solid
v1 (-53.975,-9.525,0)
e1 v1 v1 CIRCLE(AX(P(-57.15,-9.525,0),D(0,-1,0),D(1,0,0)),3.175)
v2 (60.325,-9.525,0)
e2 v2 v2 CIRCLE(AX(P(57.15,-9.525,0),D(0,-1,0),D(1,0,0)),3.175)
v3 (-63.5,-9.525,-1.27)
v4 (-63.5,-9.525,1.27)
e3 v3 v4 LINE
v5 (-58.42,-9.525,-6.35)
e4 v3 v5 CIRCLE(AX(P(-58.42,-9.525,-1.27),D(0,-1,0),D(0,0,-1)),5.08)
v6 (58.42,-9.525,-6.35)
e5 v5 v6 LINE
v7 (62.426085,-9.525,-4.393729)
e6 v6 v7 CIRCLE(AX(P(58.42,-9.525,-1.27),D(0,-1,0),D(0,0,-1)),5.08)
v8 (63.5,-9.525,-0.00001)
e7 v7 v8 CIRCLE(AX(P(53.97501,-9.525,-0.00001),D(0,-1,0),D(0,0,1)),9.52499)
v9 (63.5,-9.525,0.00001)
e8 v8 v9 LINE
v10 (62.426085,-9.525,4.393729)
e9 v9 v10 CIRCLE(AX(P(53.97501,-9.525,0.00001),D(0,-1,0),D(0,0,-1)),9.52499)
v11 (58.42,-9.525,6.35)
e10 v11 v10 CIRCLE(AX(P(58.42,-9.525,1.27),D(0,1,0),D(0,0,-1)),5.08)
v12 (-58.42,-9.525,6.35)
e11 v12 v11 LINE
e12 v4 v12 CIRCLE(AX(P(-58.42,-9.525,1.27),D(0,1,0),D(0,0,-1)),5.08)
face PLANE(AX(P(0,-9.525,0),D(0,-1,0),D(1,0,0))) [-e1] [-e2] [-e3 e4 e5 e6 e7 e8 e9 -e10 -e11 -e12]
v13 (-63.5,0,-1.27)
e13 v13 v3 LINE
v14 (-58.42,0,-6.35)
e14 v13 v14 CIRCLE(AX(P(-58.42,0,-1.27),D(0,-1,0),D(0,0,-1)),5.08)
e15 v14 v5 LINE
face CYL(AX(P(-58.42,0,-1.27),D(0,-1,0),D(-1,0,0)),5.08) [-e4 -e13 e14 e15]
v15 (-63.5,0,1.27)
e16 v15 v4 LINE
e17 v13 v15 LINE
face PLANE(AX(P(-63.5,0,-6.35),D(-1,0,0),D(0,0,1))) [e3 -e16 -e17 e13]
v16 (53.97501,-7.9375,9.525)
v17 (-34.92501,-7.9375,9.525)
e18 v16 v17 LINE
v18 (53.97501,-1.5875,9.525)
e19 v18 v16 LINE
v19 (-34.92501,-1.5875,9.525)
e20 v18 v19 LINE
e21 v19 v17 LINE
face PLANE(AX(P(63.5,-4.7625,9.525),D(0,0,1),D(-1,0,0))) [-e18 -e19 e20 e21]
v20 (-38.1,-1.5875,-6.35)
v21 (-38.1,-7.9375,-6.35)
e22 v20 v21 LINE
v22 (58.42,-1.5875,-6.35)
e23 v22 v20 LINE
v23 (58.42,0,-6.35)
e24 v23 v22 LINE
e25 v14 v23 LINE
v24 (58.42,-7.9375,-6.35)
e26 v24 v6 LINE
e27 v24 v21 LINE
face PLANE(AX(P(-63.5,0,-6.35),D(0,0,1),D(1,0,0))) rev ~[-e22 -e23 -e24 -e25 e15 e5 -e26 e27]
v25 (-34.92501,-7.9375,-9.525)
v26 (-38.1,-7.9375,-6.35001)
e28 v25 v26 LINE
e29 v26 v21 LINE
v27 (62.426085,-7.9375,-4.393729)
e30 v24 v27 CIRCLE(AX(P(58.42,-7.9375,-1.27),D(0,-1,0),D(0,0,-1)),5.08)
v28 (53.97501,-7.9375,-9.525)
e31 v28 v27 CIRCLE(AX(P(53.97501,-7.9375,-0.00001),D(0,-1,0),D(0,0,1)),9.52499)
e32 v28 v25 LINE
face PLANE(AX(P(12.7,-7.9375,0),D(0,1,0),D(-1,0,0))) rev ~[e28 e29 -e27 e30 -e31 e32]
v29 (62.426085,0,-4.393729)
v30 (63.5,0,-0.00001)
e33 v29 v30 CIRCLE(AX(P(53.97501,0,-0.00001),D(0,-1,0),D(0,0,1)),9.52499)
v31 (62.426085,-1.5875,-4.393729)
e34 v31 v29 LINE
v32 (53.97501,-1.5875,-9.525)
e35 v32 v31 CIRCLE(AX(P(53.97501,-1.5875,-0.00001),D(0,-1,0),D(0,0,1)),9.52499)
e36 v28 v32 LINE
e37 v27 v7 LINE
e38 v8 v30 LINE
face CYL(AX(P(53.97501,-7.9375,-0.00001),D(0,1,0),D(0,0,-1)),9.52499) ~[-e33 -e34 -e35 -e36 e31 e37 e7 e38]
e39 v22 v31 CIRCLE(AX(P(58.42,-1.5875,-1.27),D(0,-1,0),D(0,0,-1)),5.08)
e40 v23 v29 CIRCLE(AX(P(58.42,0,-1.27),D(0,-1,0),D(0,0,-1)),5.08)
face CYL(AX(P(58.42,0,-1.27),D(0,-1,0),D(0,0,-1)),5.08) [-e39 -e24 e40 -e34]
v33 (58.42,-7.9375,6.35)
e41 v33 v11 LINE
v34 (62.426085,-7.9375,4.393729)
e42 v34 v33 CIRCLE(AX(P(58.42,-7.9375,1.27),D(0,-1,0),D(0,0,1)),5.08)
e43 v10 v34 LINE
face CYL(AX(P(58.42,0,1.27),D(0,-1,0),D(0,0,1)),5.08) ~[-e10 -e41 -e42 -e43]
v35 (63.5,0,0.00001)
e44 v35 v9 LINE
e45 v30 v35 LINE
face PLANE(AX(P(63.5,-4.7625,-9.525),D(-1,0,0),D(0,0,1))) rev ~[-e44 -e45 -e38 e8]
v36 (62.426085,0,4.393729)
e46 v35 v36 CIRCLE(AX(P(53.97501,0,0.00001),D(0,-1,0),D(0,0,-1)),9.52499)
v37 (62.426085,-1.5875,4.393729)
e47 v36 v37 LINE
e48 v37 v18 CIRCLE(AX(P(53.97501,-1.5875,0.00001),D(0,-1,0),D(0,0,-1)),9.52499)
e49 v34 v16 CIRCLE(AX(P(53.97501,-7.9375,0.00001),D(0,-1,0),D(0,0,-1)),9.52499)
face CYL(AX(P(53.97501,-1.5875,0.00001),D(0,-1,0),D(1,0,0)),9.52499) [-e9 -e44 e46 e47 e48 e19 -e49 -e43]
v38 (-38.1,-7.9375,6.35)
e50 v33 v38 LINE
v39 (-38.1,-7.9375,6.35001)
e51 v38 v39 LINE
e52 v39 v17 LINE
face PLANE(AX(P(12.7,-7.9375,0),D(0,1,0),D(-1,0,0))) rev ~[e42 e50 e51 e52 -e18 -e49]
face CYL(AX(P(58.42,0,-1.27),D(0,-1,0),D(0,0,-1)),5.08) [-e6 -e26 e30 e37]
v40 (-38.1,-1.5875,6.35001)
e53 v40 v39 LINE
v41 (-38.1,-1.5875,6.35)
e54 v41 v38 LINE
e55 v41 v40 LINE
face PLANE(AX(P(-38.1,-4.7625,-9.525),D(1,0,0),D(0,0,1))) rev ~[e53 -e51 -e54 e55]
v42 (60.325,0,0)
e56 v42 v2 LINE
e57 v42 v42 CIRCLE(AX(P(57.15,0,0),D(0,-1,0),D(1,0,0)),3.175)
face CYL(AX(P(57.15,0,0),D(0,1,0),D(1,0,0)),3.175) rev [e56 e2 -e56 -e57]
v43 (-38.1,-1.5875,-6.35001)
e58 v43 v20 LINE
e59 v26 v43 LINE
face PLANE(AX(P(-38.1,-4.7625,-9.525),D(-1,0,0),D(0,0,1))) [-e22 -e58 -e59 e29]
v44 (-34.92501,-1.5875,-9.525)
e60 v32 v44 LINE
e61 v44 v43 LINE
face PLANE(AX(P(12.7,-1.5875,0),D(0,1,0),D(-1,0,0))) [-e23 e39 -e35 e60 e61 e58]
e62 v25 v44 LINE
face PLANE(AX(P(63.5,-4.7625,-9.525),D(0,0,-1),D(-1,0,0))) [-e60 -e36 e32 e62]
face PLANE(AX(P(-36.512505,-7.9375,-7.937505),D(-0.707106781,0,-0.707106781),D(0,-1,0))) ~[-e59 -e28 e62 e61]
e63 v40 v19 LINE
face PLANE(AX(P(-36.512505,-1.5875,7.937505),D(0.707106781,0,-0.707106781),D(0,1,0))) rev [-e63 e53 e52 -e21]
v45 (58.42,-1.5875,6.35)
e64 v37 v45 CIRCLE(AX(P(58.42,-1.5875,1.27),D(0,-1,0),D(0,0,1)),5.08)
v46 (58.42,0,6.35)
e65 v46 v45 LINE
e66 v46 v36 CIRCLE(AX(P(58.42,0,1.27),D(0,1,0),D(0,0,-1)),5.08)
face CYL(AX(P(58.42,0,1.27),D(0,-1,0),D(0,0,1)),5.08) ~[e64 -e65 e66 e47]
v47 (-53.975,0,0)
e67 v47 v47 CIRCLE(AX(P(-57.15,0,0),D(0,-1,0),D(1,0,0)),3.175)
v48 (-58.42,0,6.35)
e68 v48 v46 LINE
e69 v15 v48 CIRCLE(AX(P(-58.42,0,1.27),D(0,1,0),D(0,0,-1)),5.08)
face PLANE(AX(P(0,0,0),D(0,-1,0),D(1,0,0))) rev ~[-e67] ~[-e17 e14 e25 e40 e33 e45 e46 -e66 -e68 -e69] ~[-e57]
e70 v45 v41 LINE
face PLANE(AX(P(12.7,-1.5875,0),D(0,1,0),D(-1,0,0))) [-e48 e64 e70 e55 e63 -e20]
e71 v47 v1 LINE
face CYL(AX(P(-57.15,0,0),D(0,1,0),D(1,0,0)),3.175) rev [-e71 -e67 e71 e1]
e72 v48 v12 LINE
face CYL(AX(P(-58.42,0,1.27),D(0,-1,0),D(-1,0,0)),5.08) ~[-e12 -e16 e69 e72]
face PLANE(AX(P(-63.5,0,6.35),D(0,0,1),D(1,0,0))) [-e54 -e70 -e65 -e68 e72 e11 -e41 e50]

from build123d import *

# Parameters (mm, degrees)
F0_W          = 127
F0_H          = 12.7
F0_R          = 3.175
F1_DEPTH      = 9.525
F2_R          = 5.08
F5_W          = 101.6
F5_H          = 19.05
F6_DEPTH      = 3.175
F6_DEPTH_BACK = 3.175
F7_SIZE       = 3.17499
F8_R          = 9.52499


# Not quite as in the source:
# - a fillet or chamfer is up to 0.001 mm smaller than in the source, because OpenCascade refuses the exact size


with BuildPart() as f1:
    # F0 (on Front) → F1 (new body)
    with BuildSketch(Plane.XZ):
        Rectangle(F0_W, F0_H)
        with Locations((-57.15, 0)):
            Circle(F0_R, mode=Mode.SUBTRACT)
        with Locations((57.15, 0)):
            Circle(F0_R, mode=Mode.SUBTRACT)
    extrude(amount=F1_DEPTH)

    # F2
    f2_edges = [f1.edges().sort_by_distance(p)[0] for p in [
        (-63.5, -4.7625, 6.35),
        (-63.5, -4.7625, -6.35),
        (63.5, -4.7625, 6.35),
        (63.5, -4.7625, -6.35),
    ]]
    fillet(f2_edges, radius=F2_R)

    # F5 (on face) → F6 (join, two sides)
    with BuildSketch(Plane(origin=(0, -4.7625, 0), x_dir=(-1, 0, 0), z_dir=(0, 1, 0))) as f6_sk:
        with Locations((-12.7, 0)):
            Rectangle(F5_W, F5_H)
        with BuildLine():
            ThreePointArc((-57.1005828679, 4.1822632775), (-52.9233760572, 0.0930895553), (-57.0553988218, -4.0417364798))
            ThreePointArc((-57.0553988218, -4.0417364798), (-61.2736674525, 0.0472116417), (-57.1005828679, 4.1822632775))
        make_face(mode=Mode.SUBTRACT)
    extrude(amount=F6_DEPTH)
    extrude(f6_sk.sketch, amount=-F6_DEPTH_BACK)

    # F7 (size 3.175 in the source; OpenCascade refuses exactly that, so slightly less here)
    f7_edges = [f1.edges().sort_by_distance(p)[0] for p in [
        (-38.1, -4.7625, 9.525),
        (-38.1, -4.7625, -9.525),
    ]]
    chamfer(f7_edges, length=F7_SIZE)

    # F8 (radius 9.525 in the source; OpenCascade refuses exactly that, so slightly less here)
    f8_edges = [f1.edges().sort_by_distance(p)[0] for p in [
        (63.5, -4.7625, 9.525),
        (63.5, -4.7625, -9.525),
    ]]
    fillet(f8_edges, radius=F8_R)


solid = f1.part
